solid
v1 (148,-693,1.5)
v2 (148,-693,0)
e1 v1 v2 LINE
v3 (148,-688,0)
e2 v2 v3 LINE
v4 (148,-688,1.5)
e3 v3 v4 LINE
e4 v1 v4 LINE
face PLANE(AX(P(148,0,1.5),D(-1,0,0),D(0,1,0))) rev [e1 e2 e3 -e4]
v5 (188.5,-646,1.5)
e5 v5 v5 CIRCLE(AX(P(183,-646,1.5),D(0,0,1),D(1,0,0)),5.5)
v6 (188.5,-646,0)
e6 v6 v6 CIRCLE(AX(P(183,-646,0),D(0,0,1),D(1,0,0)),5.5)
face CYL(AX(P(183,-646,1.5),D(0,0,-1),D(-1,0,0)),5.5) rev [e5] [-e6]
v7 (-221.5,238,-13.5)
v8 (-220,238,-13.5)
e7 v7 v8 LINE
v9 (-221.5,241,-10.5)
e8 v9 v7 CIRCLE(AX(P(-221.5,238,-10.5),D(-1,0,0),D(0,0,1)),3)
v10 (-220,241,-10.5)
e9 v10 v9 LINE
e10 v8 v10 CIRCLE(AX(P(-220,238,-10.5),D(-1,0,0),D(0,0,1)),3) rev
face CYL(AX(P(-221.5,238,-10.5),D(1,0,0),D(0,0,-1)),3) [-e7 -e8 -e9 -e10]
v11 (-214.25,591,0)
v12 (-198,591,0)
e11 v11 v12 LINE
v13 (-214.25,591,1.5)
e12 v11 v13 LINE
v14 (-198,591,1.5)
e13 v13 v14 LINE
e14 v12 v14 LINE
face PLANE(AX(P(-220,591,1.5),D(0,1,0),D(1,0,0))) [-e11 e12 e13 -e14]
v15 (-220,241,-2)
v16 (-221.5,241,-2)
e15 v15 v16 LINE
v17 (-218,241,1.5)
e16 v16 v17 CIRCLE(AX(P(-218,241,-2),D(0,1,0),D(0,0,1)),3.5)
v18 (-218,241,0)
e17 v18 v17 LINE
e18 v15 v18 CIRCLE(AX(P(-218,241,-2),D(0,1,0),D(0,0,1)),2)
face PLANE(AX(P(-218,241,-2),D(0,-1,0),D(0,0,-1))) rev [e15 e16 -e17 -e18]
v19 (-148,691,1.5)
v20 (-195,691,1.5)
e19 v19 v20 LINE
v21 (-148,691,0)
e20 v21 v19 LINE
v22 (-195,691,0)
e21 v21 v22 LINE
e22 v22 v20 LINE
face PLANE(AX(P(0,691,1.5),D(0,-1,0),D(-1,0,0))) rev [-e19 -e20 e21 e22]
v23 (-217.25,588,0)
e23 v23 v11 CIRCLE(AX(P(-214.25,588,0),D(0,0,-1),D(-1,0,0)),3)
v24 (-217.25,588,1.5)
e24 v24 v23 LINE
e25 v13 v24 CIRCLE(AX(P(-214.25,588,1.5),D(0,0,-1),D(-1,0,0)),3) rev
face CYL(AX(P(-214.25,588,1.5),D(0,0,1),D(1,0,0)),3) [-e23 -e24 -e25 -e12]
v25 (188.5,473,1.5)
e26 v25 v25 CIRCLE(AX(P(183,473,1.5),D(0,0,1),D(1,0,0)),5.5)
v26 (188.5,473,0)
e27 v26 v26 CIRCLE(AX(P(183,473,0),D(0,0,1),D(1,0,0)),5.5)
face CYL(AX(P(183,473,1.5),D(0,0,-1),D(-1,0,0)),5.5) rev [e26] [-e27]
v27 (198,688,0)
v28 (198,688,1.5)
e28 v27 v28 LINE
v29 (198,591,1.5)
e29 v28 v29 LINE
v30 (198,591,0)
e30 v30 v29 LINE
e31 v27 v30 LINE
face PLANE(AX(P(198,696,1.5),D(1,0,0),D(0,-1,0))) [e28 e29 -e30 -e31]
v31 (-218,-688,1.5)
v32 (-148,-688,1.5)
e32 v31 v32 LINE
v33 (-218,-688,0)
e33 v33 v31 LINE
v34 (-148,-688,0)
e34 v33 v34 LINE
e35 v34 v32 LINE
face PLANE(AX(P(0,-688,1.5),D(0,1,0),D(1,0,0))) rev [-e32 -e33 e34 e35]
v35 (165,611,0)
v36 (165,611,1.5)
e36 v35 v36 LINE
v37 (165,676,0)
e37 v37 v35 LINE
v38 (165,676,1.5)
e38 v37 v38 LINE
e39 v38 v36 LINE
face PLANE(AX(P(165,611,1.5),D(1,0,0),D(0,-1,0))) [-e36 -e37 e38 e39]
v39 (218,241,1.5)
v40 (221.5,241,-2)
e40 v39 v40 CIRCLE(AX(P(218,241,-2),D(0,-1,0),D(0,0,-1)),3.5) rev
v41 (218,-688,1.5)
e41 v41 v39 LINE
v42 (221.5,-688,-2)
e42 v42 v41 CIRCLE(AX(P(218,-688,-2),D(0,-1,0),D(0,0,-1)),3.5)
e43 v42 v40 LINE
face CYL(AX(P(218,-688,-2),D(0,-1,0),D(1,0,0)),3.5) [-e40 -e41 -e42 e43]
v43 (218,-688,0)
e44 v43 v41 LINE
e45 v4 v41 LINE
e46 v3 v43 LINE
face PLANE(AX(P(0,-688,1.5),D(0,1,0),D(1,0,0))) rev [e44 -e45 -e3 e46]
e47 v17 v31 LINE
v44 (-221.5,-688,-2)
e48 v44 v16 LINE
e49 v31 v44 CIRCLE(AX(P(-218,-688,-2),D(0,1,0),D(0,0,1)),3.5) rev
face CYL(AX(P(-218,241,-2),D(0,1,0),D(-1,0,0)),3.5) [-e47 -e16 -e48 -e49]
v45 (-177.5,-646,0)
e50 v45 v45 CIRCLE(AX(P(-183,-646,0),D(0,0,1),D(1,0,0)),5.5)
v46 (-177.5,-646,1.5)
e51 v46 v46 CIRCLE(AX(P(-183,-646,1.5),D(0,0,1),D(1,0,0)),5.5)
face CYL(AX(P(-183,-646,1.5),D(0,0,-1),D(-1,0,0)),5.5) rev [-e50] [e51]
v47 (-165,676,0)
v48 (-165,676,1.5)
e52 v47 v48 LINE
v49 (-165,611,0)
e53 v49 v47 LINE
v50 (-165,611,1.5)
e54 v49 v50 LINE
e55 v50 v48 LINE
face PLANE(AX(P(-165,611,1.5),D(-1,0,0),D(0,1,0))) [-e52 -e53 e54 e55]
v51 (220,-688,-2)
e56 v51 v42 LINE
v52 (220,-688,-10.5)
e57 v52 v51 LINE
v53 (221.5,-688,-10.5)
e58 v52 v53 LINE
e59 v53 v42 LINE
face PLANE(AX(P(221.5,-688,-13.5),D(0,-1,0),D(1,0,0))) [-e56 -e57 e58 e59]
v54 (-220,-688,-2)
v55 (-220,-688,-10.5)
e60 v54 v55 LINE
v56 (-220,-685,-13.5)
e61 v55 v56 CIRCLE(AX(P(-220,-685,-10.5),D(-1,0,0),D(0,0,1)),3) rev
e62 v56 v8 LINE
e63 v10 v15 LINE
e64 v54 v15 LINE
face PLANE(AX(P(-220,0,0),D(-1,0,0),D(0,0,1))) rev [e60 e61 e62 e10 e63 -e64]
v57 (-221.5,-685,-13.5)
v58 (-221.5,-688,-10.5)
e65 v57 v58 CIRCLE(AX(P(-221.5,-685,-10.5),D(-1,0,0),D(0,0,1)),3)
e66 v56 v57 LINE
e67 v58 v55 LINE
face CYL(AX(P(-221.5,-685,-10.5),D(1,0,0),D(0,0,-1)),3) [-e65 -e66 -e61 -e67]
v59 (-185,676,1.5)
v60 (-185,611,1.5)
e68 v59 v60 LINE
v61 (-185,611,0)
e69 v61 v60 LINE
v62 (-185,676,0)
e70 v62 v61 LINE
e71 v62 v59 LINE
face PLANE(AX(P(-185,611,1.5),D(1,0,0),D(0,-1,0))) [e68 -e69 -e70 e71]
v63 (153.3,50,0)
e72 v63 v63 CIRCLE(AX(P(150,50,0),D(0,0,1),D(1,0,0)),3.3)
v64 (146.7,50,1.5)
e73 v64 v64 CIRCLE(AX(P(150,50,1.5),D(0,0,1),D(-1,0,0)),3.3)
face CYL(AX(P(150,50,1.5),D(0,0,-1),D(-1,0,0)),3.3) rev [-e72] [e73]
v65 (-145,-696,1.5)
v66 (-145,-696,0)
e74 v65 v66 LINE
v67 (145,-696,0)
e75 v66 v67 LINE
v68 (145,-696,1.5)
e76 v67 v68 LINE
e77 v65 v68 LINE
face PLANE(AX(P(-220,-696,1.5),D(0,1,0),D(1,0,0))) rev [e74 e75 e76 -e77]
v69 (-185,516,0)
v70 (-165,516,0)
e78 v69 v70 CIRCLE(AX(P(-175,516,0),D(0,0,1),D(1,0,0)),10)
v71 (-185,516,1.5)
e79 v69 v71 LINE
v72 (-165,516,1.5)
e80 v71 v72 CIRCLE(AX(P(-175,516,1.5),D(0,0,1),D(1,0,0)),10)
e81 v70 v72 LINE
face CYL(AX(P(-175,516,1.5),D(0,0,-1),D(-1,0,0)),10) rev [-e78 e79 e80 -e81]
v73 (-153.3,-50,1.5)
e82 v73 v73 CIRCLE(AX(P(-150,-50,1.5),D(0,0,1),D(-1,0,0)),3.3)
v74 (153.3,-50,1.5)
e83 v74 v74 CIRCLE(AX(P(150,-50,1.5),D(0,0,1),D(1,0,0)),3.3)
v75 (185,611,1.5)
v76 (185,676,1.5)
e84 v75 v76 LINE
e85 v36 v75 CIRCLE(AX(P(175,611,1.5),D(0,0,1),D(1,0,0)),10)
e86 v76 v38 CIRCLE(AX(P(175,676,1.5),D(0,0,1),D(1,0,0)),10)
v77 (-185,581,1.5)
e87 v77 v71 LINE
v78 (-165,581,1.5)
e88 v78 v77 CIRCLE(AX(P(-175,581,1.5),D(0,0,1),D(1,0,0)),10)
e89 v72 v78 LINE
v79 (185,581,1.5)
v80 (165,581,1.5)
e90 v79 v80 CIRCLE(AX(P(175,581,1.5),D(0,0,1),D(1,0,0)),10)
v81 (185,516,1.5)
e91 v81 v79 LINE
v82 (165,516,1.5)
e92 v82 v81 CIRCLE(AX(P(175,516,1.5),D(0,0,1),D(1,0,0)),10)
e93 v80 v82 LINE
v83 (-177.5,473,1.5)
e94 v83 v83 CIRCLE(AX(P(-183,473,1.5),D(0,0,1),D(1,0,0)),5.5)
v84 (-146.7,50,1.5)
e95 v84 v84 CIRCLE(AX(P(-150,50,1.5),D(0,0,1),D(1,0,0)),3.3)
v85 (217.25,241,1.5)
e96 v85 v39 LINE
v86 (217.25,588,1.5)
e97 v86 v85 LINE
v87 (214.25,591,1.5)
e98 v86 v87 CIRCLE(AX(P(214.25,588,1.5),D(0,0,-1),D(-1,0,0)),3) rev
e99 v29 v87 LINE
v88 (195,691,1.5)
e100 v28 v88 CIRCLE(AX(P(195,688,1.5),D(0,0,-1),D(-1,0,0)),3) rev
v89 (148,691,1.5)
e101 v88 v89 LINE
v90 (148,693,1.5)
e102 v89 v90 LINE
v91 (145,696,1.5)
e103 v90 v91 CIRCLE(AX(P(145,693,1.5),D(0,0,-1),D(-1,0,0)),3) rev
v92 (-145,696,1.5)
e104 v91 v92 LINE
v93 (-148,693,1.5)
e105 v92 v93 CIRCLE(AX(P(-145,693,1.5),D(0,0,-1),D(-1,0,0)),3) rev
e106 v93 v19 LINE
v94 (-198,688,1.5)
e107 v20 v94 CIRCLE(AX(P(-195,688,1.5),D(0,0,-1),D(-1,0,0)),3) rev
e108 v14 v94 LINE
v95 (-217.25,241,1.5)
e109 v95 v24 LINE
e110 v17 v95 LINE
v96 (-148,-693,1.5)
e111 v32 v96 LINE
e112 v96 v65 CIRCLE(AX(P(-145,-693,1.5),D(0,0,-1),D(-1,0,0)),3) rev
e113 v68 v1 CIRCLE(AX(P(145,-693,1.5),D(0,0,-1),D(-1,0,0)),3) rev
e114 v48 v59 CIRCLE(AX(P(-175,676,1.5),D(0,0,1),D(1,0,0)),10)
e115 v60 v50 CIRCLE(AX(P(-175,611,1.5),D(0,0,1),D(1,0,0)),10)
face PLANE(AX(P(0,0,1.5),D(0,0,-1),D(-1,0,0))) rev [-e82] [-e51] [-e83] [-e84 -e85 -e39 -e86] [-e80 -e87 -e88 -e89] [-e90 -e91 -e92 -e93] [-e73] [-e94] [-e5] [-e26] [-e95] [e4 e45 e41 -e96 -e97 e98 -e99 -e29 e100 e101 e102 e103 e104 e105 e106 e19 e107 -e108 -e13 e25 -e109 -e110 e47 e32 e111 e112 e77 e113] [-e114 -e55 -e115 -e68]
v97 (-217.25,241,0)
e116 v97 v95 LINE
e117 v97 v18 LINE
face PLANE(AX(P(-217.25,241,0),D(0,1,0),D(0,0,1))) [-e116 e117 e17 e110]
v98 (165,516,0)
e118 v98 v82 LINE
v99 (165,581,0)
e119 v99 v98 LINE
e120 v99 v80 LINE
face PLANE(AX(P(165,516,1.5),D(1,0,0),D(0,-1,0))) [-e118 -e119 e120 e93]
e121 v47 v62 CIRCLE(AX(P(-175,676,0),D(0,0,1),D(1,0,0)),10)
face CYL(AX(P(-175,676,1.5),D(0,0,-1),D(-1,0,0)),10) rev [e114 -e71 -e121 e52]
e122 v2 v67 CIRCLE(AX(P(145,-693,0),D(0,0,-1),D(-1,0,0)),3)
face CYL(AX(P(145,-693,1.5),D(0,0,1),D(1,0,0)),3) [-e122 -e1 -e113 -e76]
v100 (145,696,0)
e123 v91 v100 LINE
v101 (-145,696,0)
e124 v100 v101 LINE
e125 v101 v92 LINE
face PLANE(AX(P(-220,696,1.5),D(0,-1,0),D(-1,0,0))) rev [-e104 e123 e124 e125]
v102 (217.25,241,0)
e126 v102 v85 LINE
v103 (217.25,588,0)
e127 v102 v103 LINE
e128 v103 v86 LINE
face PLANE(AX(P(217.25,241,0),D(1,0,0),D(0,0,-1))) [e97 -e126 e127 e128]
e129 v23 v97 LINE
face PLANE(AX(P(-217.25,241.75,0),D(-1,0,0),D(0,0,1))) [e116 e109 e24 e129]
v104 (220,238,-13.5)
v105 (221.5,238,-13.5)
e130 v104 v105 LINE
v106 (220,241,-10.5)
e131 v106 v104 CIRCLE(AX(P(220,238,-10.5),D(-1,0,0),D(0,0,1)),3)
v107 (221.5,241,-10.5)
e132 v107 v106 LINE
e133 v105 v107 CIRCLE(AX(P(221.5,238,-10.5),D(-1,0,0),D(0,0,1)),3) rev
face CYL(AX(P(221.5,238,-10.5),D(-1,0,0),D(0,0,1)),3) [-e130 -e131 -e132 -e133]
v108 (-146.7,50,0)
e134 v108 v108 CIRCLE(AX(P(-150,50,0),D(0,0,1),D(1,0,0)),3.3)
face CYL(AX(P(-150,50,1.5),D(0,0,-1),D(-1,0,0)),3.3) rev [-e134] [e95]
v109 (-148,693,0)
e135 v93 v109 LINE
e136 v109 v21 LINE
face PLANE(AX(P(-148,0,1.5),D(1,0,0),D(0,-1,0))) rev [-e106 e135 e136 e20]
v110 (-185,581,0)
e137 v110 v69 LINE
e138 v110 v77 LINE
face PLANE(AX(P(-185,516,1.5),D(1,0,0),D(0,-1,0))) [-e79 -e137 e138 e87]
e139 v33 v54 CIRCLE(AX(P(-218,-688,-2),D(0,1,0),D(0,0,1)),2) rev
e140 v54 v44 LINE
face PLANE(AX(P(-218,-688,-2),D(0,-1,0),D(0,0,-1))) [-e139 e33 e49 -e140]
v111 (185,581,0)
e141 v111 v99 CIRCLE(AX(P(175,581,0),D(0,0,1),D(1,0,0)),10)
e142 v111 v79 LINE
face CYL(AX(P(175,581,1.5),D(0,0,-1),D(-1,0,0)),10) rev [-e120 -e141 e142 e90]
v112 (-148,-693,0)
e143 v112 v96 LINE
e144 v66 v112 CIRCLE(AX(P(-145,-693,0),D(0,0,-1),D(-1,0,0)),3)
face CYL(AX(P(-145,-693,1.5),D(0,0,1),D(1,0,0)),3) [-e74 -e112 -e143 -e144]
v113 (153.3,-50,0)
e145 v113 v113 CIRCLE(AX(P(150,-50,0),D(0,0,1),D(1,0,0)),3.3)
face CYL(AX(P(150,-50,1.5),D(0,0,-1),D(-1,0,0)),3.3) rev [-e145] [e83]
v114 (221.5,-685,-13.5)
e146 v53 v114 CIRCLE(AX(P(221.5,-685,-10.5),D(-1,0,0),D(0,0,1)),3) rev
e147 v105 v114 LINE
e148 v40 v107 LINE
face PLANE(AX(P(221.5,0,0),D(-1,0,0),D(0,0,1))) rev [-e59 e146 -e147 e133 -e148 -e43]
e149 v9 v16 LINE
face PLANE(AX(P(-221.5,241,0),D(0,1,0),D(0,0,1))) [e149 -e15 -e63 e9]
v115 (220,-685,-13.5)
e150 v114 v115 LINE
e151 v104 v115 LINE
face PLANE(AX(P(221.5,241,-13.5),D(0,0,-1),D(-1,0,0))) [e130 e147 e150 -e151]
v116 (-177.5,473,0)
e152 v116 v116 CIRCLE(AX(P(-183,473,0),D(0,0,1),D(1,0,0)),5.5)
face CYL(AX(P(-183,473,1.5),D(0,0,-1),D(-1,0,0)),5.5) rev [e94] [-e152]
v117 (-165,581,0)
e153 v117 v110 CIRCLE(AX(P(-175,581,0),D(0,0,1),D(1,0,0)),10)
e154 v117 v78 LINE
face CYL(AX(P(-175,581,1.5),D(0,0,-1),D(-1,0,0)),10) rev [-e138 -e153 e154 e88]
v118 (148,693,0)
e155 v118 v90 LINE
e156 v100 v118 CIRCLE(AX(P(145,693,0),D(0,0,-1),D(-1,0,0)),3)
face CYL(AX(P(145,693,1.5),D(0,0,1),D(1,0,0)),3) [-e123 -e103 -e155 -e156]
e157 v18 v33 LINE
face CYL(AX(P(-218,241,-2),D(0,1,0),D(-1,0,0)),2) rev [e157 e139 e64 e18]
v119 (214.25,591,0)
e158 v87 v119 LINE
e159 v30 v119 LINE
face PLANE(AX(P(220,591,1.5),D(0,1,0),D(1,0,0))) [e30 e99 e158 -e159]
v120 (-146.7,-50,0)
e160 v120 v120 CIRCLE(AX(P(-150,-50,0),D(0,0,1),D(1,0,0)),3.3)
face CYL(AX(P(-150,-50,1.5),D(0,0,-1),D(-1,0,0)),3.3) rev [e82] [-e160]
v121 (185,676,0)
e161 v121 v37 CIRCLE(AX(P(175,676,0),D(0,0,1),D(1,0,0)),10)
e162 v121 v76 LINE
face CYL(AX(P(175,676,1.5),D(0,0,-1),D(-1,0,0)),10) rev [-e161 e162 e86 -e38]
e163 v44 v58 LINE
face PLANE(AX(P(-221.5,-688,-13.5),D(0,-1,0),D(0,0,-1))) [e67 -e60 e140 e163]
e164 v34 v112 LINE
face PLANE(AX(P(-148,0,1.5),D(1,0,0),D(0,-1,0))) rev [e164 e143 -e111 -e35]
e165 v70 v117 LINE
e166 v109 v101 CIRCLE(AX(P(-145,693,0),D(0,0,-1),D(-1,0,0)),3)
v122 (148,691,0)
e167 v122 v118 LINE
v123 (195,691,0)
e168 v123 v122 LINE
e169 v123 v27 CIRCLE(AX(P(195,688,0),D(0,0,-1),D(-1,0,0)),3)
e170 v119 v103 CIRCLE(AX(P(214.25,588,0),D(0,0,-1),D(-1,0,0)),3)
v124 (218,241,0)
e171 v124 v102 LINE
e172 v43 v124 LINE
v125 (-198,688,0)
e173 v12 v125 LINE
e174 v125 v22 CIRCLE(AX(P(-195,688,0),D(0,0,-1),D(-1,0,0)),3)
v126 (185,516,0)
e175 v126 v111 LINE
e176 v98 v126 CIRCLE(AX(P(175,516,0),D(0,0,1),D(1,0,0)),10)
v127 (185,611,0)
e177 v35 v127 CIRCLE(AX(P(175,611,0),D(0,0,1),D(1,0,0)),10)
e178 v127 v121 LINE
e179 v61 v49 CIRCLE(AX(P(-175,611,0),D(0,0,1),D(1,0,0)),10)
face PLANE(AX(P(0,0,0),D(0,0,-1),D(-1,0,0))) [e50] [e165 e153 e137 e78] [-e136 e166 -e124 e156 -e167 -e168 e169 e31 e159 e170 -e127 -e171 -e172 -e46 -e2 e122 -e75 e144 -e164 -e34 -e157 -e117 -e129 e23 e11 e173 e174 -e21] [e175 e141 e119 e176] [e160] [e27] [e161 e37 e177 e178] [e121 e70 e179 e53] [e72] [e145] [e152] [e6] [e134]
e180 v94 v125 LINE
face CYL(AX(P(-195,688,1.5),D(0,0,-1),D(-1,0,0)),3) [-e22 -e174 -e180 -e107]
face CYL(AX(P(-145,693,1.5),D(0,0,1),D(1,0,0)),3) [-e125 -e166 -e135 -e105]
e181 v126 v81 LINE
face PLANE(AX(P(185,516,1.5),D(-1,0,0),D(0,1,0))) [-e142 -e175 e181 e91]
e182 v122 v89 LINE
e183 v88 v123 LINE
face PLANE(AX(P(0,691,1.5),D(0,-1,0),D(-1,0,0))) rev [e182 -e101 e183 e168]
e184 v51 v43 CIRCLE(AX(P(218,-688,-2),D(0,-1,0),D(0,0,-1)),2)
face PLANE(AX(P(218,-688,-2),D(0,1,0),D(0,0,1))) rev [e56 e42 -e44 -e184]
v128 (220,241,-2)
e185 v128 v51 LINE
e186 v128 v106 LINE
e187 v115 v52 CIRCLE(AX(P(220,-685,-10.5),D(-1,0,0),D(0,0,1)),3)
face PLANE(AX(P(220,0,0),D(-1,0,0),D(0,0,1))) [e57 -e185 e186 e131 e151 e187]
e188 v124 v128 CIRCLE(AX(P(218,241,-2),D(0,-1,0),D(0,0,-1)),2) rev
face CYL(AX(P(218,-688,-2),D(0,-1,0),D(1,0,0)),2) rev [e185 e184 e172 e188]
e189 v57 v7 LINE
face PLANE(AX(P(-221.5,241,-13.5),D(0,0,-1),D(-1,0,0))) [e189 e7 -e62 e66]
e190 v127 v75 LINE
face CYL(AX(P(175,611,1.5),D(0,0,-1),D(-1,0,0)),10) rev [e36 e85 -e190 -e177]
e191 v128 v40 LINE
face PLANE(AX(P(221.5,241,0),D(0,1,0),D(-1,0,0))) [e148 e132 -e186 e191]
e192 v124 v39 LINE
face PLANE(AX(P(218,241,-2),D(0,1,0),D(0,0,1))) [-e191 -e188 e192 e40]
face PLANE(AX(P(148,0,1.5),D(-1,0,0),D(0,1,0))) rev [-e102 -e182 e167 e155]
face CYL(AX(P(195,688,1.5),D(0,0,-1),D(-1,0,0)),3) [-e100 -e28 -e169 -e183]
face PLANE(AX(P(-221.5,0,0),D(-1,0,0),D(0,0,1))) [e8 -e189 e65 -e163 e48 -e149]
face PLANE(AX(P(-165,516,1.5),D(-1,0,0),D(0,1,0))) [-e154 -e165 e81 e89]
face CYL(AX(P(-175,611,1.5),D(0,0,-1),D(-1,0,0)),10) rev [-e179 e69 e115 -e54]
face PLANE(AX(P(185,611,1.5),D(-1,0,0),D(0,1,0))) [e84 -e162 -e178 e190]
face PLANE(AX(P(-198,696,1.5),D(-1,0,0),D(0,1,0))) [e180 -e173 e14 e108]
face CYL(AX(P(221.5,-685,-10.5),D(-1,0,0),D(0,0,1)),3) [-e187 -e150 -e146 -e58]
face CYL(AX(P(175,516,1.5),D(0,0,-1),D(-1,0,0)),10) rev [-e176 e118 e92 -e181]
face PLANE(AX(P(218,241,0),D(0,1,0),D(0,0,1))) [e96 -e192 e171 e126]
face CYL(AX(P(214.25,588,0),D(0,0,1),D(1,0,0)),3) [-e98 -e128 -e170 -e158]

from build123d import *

# Parameters (mm, degrees)
SKETCH_1_W                          = 440
SKETCH_1_H                          = 1392
EXTRUDE_1_DEPTH                     = 1.5
SKETCH_5_W                          = 22
SKETCH_5_H                          = 105
CUT_EXTRUDE_4_DEPTH                 = 5
SKETCH_2_R                          = 3.3
CUT_EXTRUDE_1813_DEPTH              = 10
CUT_EXTRUDE_2195_DEPTH              = 10
SKETCH_8_R                          = 5.5
CUT_EXTRUDE_3659_DEPTH              = 1.5
CUT_EXTRUDE_4343_DEPTH              = 730.944004702
CUT_EXTRUDE_4343_DEPTH_BACK         = 730.944004702
SKETCH_21_W                         = 72
SKETCH_21_H                         = 8
SKETCH_21_W_2                       = 50
SKETCH_21_H_2                       = 5
SM_EDGE_FLANGE_2_STRIP_W            = 10
SM_EDGE_FLANGE_2_STRIP_H            = 1.5
SM_EDGE_FLANGE_2_STRIP_CUT_DEPTH    = 929
SM_EDGE_FLANGE_2_RELIEF_W           = 10.75
SM_EDGE_FLANGE_2_RELIEF_H           = 0.75
SM_EDGE_FLANGE_2_RELIEF_CUT_DEPTH   = 1.5
SM_EDGE_FLANGE_2_STRIP_2_W          = 10
SM_EDGE_FLANGE_2_STRIP_2_H          = 1.5
SM_EDGE_FLANGE_2_STRIP_CUT_2_DEPTH  = 929
SM_EDGE_FLANGE_2_RELIEF_2_W         = 10.75
SM_EDGE_FLANGE_2_RELIEF_2_H         = 0.75
SM_EDGE_FLANGE_2_RELIEF_CUT_2_DEPTH = 1.5
SM_EDGE_FLANGE_2_DEPTH              = 929
SM_EDGE_FLANGE_2_BEND_DEPTH         = 929
SKETCH_32_W                         = 2.75
SKETCH_32_H                         = 349.25
CUT_EXTRUDE_7725_DEPTH              = 1.5
FILLET_5_R                          = 3


# Sheet-metal steps are written as plain solids
with BuildPart() as part:
    # Эскиз1 → Бобышка-Вытянуть1 (new body)
    with BuildSketch(Plane.XY):
        Rectangle(SKETCH_1_W, SKETCH_1_H)
    extrude(amount=EXTRUDE_1_DEPTH)

    # Эскиз5 → Вырез-Вытянуть4 (cut)
    with BuildSketch(Plane.XY.offset(1.5)):
        with Locations((-209, 643.5)):
            Rectangle(SKETCH_5_W, SKETCH_5_H)
        with Locations((209, 643.5)):
            Rectangle(SKETCH_5_W, SKETCH_5_H)
    extrude(amount=-CUT_EXTRUDE_4_DEPTH, mode=Mode.SUBTRACT)

    # Эскиз2 → Cut-Extrude 1813 (cut)
    with BuildSketch(Plane.XY.offset(1.5)):
        with Locations((-150, 50)):
            Circle(SKETCH_2_R)
        with Locations(Location((-150, -50, 0), (0, 0, 180))):
            Circle(SKETCH_2_R)
        with Locations((150, -50)):
            Circle(SKETCH_2_R)
        with Locations(Location((150, 50, 0), (0, 0, 180))):
            Circle(SKETCH_2_R)
    extrude(amount=-CUT_EXTRUDE_1813_DEPTH, mode=Mode.SUBTRACT)

    # Sketch 3 → Cut-Extrude 2195 (cut)
    with BuildSketch(Plane.XY.offset(1.5)):
        with BuildLine():
            Line((-185, 611), (-185, 676))
            ThreePointArc((-185, 676), (-175, 686), (-165, 676))
            Line((-165, 676), (-165, 611))
            ThreePointArc((-165, 611), (-175, 601), (-185, 611))
        make_face()
        with BuildLine():
            Line((-185, 516), (-185, 581))
            ThreePointArc((-185, 581), (-175, 591), (-165, 581))
            Line((-165, 581), (-165, 516))
            ThreePointArc((-165, 516), (-175, 506), (-185, 516))
        make_face()
        with BuildLine():
            Line((165, 516), (165, 581))
            ThreePointArc((165, 581), (175, 591), (185, 581))
            Line((185, 581), (185, 516))
            ThreePointArc((185, 516), (175, 506), (165, 516))
        make_face()
        with BuildLine():
            Line((165, 611), (165, 676))
            ThreePointArc((165, 676), (175, 686), (185, 676))
            Line((185, 676), (185, 611))
            ThreePointArc((185, 611), (175, 601), (165, 611))
        make_face()
    extrude(amount=-CUT_EXTRUDE_2195_DEPTH, mode=Mode.SUBTRACT)

    # Эскиз8 → Cut-Extrude 3659 (cut)
    with BuildSketch(Plane.XY.offset(1.5)):
        with Locations((183, -646)):
            Circle(SKETCH_8_R)
        with Locations((-183, -646)):
            Circle(SKETCH_8_R)
        with Locations((183, 473)):
            Circle(SKETCH_8_R)
        with Locations((-183, 473)):
            Circle(SKETCH_8_R)
    extrude(amount=-CUT_EXTRUDE_3659_DEPTH, mode=Mode.SUBTRACT)

    # Эскиз21 → Cut-Extrude 4343 (cut, two sides: drawn at the far end of the back side and taken through both)
    with BuildSketch(Plane.XY.offset(1.5).offset(-CUT_EXTRUDE_4343_DEPTH_BACK)):
        with Locations((-184, -692)):
            Rectangle(SKETCH_21_W, SKETCH_21_H)
        with Locations((-173, 693.5)):
            Rectangle(SKETCH_21_W_2, SKETCH_21_H_2)
        with Locations((184, -692)):
            Rectangle(SKETCH_21_W, SKETCH_21_H)
        with Locations((173, 693.5)):
            Rectangle(SKETCH_21_W_2, SKETCH_21_H_2)
    extrude(amount=CUT_EXTRUDE_4343_DEPTH + CUT_EXTRUDE_4343_DEPTH_BACK, mode=Mode.SUBTRACT)

    # Ребро-кромка2: sheet metal written as solids
    # Ребро-кромка2 strip (on a plane across the edge) → Ребро-кромка2 strip cut (cut)
    with BuildSketch(Plane(origin=(-220, -688, 0), x_dir=(1, 0, 0), z_dir=(0, 1, 0))):
        with Locations((-3, -0.75)):
            Rectangle(SM_EDGE_FLANGE_2_STRIP_W, SM_EDGE_FLANGE_2_STRIP_H)
    extrude(amount=SM_EDGE_FLANGE_2_STRIP_CUT_DEPTH, mode=Mode.SUBTRACT)

    # Ребро-кромка2 relief (on the sheet) → Ребро-кромка2 relief cut (cut)
    with BuildSketch(Plane(origin=(-218, -688, 0), x_dir=(1, 0, 0), z_dir=(0, 0, -1))):
        with Locations((-4.625, -929.375)):
            Rectangle(SM_EDGE_FLANGE_2_RELIEF_W, SM_EDGE_FLANGE_2_RELIEF_H)
    extrude(amount=-SM_EDGE_FLANGE_2_RELIEF_CUT_DEPTH, mode=Mode.SUBTRACT)

    # Ребро-кромка2 strip 2 (on a plane across the edge) → Ребро-кромка2 strip cut 2 (cut)
    with BuildSketch(Plane(origin=(220, 241, 0), x_dir=(-1, 0, 0), z_dir=(0, -1, 0))):
        with Locations((-3, -0.75)):
            Rectangle(SM_EDGE_FLANGE_2_STRIP_2_W, SM_EDGE_FLANGE_2_STRIP_2_H)
    extrude(amount=SM_EDGE_FLANGE_2_STRIP_CUT_2_DEPTH, mode=Mode.SUBTRACT)

    # Ребро-кромка2 relief 2 (on the sheet) → Ребро-кромка2 relief cut 2 (cut)
    with BuildSketch(Plane(origin=(218, 241, 0), x_dir=(-1, 0, 0), z_dir=(0, 0, -1))):
        with Locations((-4.625, 0.375)):
            Rectangle(SM_EDGE_FLANGE_2_RELIEF_2_W, SM_EDGE_FLANGE_2_RELIEF_2_H)
    extrude(amount=-SM_EDGE_FLANGE_2_RELIEF_CUT_2_DEPTH, mode=Mode.SUBTRACT)

    # Ребро-кромка2 section (on a plane across the edge) → Ребро-кромка2 (add)
    with BuildSketch(Plane(origin=(-220, -688, 0), x_dir=(1, 0, 0), z_dir=(0, 1, 0))):
        with BuildLine():
            Line((-1.5, 2), (-1.5, 13.5))
            Line((-1.5, 13.5), (0, 13.5))
            Line((0, 13.5), (0, 2))
            ThreePointArc((0, 2), (0.585786438, 0.585786438), (2, 0))
            Line((2, 0), (2, -1.5))
            ThreePointArc((2, -1.5), (-0.474873734, -0.474873734), (-1.5, 2))
        make_face()
    extrude(amount=SM_EDGE_FLANGE_2_DEPTH)

    # Ребро-кромка2 section 2 (on a plane across the edge) → Ребро-кромка2 bend (add)
    with BuildSketch(Plane(origin=(220, 241, 0), x_dir=(-1, 0, 0), z_dir=(0, -1, 0))):
        with BuildLine():
            Line((-1.5, 2), (-1.5, 13.5))
            Line((-1.5, 13.5), (0, 13.5))
            Line((0, 13.5), (0, 2))
            ThreePointArc((0, 2), (0.585786438, 0.585786438), (2, 0))
            Line((2, 0), (2, -1.5))
            ThreePointArc((2, -1.5), (-0.474873734, -0.474873734), (-1.5, 2))
        make_face()
    extrude(amount=SM_EDGE_FLANGE_2_BEND_DEPTH)

    # Эскиз32 → Cut-Extrude 7725 (cut)
    with BuildSketch(Plane.XY.offset(1.5)):
        with Locations((-218.625, 416.375)):
            Rectangle(SKETCH_32_W, SKETCH_32_H)
        with Locations((218.625, 416.375)):
            Rectangle(SKETCH_32_W, SKETCH_32_H)
    extrude(amount=-CUT_EXTRUDE_7725_DEPTH, mode=Mode.SUBTRACT)

    # Скругление5
    fillet_5_edges = [part.edges().sort_by_distance(p)[0] for p in [
        (-220.75, -688, -13.5),
        (-220.75, 241, -13.5),
        (220.75, 241, -13.5),
        (220.75, -688, -13.5),
        (-217.25, 591, 0.75),
        (217.25, 591, 0.75),
        (-148, 696, 0.75),
        (148, 696, 0.75),
        (198, 691, 0.75),
        (148, -696, 0.75),
        (-148, -696, 0.75),
        (-198, 691, 0.75),
    ]]
    fillet(fillet_5_edges, radius=FILLET_5_R)


solid = part.part
